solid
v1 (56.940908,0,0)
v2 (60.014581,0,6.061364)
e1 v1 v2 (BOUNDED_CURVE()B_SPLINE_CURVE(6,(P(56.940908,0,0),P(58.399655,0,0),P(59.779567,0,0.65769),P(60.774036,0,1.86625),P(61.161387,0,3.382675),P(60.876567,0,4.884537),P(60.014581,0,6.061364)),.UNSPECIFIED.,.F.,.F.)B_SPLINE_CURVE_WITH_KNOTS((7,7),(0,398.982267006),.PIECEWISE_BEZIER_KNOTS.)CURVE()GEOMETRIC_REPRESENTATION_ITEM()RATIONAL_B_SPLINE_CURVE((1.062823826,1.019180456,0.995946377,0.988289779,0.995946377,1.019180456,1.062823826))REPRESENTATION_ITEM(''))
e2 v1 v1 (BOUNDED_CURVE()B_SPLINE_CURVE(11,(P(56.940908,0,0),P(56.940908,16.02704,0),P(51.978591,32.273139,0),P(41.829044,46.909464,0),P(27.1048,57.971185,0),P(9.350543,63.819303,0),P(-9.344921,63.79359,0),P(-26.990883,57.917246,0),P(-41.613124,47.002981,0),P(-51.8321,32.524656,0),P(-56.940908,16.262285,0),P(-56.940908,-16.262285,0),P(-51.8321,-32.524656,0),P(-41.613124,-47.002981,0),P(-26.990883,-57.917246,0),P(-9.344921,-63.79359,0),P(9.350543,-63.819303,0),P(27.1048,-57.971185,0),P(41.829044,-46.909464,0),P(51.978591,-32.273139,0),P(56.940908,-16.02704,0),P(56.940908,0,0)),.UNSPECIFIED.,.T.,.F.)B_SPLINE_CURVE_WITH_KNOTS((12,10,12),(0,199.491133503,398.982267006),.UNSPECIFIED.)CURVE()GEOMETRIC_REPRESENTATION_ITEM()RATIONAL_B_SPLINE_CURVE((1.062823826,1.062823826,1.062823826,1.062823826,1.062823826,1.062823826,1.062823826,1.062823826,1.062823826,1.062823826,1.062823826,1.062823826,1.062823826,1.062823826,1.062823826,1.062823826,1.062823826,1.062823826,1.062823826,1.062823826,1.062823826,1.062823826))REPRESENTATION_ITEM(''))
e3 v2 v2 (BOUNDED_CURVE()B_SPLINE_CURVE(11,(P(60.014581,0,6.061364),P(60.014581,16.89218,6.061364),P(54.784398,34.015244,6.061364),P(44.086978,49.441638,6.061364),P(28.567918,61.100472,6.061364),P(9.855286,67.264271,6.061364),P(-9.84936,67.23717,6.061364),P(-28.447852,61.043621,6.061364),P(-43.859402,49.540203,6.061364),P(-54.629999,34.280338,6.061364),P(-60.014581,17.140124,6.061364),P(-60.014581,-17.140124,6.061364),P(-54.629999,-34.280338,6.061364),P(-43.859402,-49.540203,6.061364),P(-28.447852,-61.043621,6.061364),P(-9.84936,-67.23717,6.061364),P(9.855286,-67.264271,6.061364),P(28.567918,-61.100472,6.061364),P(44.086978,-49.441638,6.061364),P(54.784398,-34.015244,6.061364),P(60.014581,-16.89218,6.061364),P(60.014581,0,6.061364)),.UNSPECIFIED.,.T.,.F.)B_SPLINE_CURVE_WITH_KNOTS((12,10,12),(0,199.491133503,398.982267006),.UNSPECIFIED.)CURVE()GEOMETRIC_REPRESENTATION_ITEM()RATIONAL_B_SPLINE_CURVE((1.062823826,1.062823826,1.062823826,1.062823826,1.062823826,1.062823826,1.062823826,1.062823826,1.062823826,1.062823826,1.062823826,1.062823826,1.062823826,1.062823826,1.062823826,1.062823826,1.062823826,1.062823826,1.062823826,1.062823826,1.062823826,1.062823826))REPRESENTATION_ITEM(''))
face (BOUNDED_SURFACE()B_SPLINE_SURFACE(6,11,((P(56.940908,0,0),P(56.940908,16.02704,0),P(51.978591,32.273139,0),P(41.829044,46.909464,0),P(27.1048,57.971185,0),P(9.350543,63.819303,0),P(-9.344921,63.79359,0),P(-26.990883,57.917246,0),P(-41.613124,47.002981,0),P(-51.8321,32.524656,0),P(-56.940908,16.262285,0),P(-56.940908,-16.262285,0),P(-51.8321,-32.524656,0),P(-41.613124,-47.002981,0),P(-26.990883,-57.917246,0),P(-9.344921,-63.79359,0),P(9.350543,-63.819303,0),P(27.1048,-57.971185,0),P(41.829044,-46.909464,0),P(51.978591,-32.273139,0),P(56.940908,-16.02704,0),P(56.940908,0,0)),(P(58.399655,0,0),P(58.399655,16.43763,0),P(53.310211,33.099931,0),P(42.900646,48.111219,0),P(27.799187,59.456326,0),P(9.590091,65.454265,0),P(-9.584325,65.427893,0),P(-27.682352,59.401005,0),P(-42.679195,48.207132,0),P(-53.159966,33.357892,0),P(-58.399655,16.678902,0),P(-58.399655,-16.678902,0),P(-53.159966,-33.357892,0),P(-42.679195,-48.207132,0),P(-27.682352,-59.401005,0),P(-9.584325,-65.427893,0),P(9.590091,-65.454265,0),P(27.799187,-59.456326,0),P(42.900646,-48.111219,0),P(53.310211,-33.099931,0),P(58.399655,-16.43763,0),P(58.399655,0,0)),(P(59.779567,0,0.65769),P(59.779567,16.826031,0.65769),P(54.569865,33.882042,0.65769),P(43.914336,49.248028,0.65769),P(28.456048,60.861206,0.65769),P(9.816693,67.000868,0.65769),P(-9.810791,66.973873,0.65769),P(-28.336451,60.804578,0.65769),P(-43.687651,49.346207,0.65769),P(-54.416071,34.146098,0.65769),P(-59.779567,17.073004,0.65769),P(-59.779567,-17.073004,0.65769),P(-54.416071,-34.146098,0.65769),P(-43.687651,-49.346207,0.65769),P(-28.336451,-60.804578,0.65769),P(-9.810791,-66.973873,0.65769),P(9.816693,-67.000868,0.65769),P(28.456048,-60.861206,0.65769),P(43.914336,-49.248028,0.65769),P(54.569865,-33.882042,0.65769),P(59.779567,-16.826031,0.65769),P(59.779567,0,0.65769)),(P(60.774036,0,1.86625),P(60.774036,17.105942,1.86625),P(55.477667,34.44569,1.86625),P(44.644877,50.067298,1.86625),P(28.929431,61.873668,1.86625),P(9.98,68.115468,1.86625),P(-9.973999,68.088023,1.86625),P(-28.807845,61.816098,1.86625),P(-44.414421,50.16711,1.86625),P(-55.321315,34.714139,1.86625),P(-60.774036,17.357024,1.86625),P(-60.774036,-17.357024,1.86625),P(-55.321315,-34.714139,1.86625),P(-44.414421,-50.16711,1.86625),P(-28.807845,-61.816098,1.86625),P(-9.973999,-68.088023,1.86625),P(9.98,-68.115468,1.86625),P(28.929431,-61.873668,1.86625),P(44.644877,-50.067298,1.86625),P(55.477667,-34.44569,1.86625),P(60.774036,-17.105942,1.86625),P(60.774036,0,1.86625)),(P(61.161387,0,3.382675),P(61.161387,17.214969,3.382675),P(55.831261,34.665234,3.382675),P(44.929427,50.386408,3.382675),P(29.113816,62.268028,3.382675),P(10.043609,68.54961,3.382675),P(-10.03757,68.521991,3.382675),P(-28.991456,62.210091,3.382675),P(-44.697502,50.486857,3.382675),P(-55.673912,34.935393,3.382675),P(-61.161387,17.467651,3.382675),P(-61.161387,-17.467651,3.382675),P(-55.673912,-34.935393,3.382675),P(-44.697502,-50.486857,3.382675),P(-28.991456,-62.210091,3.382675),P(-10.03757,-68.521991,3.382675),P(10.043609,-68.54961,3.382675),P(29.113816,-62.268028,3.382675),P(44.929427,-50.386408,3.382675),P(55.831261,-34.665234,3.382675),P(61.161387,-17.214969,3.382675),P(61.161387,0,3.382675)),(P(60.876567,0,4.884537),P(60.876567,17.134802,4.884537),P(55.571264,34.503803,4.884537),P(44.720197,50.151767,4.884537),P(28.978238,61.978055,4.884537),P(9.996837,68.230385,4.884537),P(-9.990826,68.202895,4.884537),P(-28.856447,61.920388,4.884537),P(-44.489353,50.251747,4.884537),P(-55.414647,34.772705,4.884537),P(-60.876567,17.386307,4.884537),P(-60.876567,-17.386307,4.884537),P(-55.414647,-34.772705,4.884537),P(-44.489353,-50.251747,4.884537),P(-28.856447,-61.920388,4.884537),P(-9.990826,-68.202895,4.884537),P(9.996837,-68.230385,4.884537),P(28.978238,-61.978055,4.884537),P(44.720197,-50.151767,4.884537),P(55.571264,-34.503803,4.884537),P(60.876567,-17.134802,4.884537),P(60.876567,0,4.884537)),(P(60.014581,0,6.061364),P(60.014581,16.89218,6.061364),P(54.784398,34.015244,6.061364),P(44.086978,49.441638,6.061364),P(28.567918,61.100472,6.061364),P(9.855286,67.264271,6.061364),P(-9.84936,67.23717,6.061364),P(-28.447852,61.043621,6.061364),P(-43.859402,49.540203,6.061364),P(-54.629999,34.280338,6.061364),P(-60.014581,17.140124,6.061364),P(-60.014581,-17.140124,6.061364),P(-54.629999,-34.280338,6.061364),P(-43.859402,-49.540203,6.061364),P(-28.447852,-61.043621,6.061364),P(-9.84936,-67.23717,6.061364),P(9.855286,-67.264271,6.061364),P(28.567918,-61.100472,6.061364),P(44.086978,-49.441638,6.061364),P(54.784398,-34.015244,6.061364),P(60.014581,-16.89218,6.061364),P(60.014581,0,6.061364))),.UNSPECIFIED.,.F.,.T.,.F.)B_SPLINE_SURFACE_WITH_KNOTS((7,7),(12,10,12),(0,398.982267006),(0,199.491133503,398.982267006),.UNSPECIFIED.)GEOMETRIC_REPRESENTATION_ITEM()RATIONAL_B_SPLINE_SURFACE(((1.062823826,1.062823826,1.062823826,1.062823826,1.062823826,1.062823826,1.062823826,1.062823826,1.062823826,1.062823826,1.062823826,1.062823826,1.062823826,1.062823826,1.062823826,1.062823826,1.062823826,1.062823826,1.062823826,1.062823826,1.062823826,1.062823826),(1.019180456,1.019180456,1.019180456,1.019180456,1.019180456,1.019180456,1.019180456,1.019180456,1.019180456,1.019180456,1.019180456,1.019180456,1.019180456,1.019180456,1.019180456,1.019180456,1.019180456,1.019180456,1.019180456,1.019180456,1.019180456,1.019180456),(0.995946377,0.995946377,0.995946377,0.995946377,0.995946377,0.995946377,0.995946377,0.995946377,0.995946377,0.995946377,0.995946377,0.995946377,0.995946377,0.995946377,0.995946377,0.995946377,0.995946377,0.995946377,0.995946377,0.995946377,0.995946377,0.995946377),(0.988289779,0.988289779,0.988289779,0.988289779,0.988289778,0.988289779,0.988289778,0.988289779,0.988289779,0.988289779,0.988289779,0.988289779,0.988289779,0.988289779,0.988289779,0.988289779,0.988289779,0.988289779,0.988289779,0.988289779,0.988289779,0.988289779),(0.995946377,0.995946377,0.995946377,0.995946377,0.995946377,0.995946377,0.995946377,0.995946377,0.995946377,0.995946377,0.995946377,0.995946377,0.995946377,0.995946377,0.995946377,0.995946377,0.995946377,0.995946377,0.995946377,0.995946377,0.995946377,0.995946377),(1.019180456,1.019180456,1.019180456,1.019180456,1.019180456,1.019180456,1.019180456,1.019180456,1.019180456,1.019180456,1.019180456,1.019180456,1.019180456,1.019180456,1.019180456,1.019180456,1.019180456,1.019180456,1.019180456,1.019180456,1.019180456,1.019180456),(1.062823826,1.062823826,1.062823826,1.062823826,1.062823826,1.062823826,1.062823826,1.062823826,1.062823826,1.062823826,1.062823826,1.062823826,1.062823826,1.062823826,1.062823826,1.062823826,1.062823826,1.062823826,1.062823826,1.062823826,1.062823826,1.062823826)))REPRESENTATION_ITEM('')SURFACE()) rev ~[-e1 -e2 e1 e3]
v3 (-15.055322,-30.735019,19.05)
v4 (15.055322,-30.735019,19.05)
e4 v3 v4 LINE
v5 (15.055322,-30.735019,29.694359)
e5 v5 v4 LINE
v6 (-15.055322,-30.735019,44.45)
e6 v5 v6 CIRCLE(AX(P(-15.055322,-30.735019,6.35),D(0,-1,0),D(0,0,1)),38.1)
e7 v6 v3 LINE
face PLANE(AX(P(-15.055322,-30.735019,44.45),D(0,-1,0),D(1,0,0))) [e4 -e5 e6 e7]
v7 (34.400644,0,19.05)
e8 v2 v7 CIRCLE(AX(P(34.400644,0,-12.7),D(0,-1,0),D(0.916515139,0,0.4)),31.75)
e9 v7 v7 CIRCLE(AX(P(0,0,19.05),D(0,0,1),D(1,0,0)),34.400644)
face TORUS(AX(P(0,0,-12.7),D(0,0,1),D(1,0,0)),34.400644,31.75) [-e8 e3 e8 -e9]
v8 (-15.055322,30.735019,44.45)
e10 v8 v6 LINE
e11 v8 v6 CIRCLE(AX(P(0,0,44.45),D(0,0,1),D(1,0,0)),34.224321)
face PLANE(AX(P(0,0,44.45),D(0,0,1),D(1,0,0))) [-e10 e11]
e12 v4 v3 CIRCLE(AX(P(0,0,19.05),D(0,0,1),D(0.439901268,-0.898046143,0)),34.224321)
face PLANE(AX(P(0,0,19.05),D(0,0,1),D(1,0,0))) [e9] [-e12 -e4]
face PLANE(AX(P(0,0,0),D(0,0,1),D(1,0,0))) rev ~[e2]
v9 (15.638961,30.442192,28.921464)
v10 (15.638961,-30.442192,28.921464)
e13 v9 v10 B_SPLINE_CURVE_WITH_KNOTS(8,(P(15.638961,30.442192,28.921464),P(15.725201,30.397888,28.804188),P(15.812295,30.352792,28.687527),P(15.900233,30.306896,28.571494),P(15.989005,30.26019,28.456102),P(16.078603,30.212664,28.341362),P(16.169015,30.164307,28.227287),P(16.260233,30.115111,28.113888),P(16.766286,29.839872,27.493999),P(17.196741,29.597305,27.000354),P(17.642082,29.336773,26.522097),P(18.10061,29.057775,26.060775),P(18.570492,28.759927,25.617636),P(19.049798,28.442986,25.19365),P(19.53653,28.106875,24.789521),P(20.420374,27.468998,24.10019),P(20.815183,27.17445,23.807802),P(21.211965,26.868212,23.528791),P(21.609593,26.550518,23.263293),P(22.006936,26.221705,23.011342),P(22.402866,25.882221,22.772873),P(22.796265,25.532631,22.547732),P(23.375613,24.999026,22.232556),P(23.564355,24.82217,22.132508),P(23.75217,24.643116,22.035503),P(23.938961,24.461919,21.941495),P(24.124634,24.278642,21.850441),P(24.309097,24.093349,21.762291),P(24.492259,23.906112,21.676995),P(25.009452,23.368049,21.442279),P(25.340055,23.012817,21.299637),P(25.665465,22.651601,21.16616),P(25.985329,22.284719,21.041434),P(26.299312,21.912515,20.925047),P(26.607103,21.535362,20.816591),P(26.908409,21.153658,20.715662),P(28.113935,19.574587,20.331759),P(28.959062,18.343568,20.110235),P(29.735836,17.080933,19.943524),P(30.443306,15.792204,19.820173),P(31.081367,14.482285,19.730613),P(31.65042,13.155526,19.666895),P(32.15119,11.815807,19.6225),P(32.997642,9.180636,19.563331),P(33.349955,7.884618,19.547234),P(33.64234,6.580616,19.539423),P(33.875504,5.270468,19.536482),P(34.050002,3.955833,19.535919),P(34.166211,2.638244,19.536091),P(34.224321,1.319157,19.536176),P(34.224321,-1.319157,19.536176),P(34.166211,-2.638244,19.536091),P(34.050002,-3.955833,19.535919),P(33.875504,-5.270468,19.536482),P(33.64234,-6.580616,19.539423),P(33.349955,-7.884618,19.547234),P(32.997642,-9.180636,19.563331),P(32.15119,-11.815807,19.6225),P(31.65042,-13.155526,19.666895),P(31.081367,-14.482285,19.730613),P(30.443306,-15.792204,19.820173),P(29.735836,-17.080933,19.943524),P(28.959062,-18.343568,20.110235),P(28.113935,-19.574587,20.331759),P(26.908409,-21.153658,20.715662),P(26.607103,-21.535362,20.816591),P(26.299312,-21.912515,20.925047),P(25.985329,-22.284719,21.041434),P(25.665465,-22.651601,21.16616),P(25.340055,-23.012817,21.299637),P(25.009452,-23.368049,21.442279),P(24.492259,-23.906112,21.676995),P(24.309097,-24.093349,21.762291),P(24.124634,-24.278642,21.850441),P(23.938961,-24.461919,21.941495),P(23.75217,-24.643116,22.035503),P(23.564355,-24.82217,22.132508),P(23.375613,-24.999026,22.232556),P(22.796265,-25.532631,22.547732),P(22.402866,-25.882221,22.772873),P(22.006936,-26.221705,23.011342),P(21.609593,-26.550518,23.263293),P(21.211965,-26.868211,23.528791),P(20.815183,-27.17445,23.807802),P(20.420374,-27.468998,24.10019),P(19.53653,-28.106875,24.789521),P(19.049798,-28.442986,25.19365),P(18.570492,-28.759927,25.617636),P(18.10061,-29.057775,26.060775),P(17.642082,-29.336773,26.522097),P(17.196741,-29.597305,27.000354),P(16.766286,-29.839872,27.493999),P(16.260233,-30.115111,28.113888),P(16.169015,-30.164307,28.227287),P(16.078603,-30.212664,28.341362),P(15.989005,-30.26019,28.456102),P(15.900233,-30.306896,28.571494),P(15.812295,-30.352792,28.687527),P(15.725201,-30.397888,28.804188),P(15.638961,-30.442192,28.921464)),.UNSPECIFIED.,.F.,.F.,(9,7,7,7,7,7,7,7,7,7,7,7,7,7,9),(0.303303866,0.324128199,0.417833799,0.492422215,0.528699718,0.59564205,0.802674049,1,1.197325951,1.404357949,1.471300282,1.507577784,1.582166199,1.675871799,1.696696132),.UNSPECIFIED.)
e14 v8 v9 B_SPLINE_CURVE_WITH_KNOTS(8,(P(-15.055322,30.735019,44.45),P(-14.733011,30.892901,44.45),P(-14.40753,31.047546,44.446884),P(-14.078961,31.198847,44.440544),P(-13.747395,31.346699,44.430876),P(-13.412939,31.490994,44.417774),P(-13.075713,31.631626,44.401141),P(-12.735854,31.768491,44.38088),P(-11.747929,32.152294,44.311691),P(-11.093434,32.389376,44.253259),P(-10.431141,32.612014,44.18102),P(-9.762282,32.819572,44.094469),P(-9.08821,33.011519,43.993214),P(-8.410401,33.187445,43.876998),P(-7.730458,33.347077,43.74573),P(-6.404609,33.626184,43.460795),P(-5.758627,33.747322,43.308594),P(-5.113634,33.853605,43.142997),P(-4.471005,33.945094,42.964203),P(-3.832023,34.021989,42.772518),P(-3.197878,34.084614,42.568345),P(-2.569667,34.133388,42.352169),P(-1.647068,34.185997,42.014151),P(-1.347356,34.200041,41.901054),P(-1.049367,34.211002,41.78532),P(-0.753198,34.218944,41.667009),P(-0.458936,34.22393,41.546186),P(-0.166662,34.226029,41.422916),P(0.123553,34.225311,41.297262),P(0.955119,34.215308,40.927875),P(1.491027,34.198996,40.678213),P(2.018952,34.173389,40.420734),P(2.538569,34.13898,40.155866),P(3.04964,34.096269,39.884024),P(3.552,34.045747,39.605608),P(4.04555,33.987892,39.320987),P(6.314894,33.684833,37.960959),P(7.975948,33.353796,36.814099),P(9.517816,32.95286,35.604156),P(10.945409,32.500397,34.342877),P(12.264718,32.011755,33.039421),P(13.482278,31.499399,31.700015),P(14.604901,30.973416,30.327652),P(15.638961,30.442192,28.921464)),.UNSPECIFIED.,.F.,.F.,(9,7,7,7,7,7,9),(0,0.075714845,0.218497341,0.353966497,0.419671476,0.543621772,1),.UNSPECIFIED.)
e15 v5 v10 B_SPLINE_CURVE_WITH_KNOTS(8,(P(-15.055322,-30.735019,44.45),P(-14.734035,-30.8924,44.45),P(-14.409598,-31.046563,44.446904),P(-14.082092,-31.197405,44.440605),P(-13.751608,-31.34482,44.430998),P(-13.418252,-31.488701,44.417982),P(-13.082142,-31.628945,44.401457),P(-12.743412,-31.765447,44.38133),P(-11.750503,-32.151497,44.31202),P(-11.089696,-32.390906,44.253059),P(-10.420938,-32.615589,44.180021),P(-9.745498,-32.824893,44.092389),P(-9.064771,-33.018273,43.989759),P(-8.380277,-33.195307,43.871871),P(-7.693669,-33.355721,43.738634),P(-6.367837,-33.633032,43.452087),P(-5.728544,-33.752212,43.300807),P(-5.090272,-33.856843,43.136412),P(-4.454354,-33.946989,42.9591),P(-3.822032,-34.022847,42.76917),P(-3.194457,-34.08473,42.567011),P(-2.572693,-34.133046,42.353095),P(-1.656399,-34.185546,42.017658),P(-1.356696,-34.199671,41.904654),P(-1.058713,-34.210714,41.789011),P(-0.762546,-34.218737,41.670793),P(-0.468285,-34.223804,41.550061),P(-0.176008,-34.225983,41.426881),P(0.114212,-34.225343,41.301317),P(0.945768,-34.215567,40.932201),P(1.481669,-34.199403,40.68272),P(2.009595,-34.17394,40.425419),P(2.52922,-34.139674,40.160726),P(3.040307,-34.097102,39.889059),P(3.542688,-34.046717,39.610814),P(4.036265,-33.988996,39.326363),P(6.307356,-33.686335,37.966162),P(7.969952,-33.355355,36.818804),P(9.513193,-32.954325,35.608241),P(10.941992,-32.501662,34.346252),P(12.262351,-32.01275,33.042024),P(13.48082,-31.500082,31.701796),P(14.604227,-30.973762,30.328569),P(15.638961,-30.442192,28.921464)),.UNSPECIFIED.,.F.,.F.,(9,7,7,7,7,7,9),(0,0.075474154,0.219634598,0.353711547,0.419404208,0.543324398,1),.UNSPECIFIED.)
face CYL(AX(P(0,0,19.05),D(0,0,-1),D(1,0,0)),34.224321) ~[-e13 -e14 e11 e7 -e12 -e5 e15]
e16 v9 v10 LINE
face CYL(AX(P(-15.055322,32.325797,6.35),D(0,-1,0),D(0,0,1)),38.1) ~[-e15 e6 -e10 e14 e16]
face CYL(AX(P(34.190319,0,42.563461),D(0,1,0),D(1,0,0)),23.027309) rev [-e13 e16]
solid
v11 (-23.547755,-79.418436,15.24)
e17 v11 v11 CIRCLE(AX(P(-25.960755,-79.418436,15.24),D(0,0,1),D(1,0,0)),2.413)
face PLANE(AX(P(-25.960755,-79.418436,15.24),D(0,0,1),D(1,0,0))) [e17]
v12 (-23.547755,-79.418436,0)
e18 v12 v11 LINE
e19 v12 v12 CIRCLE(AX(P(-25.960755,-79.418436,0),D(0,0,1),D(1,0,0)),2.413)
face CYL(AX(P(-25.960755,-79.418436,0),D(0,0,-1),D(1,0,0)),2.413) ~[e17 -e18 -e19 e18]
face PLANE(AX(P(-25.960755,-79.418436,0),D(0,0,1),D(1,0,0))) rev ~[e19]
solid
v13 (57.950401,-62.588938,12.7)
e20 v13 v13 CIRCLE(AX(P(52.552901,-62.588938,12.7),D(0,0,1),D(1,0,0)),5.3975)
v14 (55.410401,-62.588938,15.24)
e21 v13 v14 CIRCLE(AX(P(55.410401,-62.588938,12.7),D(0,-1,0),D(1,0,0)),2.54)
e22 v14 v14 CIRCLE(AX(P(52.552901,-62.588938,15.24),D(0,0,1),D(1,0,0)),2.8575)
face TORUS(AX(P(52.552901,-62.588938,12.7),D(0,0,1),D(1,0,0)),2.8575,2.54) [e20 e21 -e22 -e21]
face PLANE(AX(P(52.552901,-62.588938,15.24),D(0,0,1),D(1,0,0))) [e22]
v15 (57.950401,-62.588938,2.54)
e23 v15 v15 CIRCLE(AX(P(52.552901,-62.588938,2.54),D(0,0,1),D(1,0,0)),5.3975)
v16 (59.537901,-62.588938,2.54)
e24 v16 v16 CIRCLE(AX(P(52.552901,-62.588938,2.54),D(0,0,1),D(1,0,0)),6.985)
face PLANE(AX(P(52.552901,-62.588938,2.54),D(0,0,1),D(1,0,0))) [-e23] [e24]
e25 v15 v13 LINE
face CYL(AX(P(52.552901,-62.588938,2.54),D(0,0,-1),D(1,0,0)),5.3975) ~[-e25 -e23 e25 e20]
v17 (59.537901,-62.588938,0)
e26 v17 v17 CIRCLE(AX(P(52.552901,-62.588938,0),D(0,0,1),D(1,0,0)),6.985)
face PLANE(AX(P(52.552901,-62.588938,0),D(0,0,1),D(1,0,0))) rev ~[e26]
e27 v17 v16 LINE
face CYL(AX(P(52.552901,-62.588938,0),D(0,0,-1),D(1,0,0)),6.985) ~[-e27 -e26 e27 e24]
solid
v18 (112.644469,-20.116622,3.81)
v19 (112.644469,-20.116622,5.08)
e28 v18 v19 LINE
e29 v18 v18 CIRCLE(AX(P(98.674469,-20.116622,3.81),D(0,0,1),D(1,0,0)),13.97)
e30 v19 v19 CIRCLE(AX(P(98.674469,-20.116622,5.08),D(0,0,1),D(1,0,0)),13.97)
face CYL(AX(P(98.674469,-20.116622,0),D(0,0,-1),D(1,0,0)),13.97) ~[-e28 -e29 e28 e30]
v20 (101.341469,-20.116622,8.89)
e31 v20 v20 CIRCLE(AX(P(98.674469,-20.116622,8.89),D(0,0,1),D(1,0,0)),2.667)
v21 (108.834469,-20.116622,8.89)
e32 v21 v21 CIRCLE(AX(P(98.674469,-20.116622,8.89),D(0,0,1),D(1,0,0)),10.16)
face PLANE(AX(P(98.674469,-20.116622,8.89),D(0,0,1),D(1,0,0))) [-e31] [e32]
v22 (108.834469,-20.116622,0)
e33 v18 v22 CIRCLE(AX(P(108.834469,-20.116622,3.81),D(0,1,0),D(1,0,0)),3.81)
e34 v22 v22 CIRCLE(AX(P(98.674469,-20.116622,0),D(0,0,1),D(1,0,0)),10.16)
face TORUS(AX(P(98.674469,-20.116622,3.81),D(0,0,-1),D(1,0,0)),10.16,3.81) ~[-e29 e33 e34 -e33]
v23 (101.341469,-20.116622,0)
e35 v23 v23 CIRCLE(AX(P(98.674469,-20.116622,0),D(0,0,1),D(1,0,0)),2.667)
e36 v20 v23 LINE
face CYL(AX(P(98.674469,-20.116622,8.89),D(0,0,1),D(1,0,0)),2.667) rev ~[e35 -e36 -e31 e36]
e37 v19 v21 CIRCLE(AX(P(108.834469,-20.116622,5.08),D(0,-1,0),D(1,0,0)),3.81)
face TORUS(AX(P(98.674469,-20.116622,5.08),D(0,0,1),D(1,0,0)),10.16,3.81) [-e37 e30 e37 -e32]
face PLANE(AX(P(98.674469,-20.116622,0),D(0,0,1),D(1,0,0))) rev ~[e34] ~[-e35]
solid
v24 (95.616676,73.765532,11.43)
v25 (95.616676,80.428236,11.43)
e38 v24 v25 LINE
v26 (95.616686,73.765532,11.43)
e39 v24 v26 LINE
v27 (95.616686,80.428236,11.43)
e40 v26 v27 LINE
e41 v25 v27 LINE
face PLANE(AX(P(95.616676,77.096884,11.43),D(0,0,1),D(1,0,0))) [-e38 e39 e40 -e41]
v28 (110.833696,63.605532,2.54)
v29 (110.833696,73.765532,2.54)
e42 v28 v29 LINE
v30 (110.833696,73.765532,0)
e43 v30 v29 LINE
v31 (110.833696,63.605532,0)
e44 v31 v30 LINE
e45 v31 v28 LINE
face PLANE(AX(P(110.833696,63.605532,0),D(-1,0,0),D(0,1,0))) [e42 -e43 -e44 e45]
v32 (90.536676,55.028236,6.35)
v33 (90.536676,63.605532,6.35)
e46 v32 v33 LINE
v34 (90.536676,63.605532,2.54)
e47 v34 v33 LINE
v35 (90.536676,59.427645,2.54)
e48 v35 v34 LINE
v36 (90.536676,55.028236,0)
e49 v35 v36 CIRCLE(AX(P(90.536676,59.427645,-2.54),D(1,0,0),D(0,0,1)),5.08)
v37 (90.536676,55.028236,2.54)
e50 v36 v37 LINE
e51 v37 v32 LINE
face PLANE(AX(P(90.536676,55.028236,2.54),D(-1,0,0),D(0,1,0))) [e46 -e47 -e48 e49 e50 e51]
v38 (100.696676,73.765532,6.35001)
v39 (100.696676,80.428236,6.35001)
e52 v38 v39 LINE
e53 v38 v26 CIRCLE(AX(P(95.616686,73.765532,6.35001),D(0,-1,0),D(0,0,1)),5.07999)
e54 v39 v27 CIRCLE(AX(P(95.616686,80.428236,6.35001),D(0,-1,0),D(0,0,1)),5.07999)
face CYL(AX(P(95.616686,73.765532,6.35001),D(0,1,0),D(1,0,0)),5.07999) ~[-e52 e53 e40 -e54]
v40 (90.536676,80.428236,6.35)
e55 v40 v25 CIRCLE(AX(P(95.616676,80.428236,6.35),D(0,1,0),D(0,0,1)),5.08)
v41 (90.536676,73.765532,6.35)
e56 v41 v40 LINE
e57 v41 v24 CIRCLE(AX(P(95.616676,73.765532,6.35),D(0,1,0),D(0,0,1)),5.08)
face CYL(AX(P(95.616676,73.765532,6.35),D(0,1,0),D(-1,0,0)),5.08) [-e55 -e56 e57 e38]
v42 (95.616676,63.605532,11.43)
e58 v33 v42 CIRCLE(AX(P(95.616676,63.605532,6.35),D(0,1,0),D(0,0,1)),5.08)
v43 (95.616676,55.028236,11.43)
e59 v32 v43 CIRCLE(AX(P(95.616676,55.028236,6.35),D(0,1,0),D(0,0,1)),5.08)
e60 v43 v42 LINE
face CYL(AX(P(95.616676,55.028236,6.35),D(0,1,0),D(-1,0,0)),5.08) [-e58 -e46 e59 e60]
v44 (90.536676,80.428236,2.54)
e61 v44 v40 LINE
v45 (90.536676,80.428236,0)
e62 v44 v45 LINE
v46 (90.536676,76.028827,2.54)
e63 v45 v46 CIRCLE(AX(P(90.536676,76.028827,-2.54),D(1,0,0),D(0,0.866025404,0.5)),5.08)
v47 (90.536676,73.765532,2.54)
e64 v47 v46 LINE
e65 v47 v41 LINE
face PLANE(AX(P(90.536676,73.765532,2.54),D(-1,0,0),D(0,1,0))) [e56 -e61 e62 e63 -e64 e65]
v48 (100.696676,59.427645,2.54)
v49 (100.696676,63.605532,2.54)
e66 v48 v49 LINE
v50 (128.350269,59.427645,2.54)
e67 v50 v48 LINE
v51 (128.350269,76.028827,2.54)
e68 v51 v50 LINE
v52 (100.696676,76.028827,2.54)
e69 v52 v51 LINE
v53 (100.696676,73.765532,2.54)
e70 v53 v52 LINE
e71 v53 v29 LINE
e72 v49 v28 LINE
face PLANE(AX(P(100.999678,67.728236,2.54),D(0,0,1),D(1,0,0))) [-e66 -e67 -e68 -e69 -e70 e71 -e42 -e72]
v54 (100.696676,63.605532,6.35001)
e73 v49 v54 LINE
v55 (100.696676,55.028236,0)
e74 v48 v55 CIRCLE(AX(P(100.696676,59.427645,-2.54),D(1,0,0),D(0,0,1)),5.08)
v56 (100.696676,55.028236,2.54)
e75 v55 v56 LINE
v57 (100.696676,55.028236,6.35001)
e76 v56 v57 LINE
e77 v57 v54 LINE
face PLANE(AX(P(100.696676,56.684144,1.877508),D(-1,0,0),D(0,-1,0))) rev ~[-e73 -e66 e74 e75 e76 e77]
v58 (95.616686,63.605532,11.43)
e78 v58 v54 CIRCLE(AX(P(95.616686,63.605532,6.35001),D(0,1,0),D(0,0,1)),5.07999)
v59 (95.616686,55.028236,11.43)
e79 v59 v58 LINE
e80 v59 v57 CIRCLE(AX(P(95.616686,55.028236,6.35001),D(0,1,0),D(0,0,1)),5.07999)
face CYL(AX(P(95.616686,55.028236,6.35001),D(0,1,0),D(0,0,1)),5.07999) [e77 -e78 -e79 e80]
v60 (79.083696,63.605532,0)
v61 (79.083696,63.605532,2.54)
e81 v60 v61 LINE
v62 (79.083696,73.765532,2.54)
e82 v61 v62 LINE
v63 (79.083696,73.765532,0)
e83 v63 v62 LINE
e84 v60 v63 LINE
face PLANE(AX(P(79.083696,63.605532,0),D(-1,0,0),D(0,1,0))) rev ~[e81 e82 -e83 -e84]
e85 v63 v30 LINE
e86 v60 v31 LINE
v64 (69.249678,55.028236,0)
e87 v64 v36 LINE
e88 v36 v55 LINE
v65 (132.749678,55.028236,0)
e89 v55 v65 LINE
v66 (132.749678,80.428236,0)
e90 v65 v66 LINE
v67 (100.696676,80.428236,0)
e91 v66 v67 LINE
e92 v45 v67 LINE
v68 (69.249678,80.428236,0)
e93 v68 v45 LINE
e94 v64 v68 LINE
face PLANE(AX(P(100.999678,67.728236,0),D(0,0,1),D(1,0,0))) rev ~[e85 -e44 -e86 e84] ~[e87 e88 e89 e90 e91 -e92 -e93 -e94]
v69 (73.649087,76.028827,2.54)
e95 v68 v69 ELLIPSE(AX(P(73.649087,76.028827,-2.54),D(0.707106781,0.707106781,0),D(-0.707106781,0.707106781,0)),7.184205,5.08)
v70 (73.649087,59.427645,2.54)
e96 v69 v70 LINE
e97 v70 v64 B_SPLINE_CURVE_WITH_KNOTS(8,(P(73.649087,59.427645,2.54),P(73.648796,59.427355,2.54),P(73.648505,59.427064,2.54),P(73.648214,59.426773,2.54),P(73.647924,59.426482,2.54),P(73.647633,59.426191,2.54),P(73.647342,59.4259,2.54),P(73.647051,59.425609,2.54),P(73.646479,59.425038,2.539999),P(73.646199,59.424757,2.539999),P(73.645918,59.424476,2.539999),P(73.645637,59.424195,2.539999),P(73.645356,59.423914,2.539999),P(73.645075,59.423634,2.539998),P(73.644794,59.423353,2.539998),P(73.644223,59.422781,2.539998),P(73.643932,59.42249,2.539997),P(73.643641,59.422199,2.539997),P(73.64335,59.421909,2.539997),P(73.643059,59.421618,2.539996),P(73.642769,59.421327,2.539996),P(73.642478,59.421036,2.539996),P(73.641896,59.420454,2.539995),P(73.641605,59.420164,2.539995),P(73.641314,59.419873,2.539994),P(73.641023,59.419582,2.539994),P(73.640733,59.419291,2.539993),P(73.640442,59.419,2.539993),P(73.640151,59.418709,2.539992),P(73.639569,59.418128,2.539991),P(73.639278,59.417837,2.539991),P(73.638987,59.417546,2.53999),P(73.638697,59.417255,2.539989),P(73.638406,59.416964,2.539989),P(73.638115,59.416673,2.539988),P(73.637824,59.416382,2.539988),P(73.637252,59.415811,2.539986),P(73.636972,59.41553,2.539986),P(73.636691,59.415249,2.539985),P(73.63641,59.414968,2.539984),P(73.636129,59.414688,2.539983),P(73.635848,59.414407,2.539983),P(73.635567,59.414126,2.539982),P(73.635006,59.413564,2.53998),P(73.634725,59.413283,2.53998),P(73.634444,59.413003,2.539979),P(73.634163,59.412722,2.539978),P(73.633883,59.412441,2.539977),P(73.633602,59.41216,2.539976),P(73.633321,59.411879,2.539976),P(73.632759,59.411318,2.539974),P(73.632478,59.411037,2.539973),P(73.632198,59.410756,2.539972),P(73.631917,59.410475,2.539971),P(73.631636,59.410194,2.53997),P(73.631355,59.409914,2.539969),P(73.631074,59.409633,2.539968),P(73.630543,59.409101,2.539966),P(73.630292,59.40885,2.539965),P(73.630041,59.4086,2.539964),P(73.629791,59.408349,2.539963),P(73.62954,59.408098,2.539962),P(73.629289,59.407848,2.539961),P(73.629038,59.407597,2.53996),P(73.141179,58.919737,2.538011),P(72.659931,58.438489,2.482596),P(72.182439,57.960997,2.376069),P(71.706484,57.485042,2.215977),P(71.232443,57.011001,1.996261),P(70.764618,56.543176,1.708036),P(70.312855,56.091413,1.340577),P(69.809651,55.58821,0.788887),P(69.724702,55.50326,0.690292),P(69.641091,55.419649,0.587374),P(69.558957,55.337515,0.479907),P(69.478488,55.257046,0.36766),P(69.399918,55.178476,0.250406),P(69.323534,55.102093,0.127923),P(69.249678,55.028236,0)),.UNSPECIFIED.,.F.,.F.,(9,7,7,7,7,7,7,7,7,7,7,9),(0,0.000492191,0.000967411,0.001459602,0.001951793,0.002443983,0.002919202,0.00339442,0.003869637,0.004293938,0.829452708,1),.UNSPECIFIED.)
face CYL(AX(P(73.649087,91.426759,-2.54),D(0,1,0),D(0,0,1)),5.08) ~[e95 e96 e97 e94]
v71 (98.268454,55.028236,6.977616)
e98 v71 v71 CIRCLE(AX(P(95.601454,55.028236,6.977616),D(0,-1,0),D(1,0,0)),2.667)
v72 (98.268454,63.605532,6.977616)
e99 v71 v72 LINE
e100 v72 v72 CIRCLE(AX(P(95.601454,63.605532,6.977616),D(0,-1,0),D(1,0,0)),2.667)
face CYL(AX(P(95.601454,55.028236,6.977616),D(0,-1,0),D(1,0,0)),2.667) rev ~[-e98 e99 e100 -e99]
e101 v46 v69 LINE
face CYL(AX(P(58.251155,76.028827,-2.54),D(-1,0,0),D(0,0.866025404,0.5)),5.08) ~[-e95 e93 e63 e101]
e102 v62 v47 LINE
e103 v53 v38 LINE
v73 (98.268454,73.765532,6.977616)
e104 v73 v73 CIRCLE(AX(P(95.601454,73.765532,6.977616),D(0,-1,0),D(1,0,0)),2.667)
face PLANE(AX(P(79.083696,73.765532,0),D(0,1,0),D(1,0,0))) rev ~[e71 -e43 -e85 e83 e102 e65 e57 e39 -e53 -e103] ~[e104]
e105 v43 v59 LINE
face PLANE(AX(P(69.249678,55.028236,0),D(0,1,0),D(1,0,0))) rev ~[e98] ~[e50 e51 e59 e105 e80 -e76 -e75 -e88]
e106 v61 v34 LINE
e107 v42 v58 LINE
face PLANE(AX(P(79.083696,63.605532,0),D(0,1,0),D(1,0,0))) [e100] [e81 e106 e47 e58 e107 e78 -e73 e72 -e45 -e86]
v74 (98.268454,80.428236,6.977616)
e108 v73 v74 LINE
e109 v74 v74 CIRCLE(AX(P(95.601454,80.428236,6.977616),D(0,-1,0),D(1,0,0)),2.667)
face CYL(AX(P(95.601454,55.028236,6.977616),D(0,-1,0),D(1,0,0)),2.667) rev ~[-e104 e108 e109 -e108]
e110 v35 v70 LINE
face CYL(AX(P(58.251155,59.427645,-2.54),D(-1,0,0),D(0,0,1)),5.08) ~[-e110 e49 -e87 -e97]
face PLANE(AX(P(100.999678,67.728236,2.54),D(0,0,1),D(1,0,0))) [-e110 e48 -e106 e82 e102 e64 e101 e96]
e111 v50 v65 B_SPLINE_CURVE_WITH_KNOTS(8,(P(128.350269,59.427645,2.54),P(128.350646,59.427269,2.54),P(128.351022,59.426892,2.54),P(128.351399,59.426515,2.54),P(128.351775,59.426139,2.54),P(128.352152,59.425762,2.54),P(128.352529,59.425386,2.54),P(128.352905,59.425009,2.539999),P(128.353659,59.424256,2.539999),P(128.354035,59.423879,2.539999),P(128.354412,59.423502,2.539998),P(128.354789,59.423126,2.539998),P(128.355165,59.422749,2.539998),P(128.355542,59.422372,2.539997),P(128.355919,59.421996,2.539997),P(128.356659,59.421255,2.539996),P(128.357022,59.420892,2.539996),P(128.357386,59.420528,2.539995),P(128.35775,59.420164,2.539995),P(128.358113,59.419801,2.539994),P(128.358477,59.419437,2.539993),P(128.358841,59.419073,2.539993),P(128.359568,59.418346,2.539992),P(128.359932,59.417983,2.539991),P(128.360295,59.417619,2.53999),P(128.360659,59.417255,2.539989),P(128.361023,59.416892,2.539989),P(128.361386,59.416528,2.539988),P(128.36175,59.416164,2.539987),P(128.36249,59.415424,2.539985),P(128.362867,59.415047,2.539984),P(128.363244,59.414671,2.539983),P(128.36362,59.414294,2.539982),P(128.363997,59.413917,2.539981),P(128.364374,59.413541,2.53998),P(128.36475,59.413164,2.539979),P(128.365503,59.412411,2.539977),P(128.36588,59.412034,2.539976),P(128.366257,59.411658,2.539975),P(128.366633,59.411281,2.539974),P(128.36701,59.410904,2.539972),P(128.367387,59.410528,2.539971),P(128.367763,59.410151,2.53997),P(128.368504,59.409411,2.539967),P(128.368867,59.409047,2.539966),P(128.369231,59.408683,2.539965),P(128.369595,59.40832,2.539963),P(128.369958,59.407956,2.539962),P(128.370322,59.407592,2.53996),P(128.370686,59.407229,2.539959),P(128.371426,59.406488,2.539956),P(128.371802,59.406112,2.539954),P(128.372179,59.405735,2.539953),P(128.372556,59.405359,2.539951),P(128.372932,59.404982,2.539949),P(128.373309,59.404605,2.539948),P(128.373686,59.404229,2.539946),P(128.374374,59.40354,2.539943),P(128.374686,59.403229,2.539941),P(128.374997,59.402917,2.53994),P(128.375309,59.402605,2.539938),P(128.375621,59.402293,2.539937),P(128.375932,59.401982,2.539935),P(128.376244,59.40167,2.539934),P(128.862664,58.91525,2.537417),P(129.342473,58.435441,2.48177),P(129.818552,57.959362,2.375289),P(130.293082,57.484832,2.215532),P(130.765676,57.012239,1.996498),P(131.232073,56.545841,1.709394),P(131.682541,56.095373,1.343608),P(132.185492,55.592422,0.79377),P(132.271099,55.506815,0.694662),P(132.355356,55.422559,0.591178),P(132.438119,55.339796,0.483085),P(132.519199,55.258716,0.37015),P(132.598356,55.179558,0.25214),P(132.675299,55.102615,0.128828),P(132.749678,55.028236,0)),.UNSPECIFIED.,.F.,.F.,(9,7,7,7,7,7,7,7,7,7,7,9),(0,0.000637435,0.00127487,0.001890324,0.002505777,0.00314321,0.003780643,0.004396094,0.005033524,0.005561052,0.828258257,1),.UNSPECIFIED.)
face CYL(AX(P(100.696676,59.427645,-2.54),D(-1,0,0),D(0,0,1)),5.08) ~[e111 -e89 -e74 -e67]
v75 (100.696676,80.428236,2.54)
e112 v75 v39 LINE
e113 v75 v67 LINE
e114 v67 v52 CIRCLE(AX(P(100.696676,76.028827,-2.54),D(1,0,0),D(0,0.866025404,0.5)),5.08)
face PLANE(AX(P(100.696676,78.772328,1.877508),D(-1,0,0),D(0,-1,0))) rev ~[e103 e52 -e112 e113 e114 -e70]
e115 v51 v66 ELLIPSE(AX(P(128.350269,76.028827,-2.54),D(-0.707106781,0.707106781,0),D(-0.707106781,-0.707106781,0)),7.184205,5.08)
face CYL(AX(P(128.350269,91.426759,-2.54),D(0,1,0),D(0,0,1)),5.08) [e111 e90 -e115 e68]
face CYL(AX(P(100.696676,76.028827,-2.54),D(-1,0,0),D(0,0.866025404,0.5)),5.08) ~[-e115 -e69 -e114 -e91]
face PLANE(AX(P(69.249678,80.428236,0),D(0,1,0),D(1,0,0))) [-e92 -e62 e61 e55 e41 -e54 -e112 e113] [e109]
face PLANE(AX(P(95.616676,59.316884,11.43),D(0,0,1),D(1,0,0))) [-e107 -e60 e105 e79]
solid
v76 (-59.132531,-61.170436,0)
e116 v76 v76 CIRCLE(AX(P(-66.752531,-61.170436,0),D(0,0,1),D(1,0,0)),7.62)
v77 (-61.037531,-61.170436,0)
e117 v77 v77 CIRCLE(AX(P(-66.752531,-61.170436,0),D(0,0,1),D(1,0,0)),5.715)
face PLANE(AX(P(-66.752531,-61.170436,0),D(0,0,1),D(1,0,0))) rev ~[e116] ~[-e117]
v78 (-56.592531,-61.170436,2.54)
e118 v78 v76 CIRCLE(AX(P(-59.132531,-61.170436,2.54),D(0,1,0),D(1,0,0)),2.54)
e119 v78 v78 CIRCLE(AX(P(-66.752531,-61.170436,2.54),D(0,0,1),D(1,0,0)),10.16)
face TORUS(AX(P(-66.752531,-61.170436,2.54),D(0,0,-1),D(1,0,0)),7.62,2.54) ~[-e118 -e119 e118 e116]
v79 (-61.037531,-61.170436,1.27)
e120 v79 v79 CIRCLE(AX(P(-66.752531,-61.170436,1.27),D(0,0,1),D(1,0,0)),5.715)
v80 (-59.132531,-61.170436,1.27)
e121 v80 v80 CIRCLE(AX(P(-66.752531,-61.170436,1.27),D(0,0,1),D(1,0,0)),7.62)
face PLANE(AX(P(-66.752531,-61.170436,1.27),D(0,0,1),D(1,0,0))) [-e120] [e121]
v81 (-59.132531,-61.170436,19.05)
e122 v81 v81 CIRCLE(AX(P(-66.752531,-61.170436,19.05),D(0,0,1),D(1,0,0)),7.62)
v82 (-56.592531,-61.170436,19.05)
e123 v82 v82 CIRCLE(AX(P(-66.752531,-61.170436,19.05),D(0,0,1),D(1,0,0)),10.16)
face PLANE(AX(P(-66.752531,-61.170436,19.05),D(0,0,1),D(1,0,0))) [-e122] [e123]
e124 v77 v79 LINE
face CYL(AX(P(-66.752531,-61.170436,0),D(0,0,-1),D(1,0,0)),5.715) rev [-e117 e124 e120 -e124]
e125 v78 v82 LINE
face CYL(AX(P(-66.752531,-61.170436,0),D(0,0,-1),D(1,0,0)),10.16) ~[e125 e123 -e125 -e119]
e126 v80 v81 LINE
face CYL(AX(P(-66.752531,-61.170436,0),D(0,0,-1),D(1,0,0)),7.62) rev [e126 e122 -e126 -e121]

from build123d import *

# Parameters (mm, degrees)
F0_R          = 63.5
F1_DEPTH      = 19.05
F3_R          = 3.81
F4_R          = 34.2243208574
F5_DEPTH      = 25.4
F6_R          = 23.0273094471
F7_DEPTH      = 60.7519101096
F8_DEPTH      = 71.374
F9_R          = 38.1
F10_R         = 7.62
F10_R_2       = 5.715
F11_DEPTH     = 1.27
F10_R_3       = 10.16
F12_DEPTH     = 19.05
F13_R         = 2.54
F14_R         = 6.985
F15_DEPTH     = 2.54
F16_R         = 5.3975
F17_DEPTH     = 12.7
F18_R         = 2.54
F19_W         = 30.2823996797
F19_H         = 4.1530619248
F20_DEPTH     = 25.4
F21_W         = 63.5
F21_H         = 25.4
F21_W_2       = 31.75
F21_H_2       = 10.16
F22_DEPTH     = 2.54
F23_W         = 10.16
F23_H         = 8.5772957325
F23_H_2       = 6.6627042675
F24_DEPTH     = 8.89
F25_R         = 5.08
F26_R         = 5.07999
F28_R         = 2.667
F29_DEPTH     = 150.114
F30_T1_DEPTH  = 43.0515242213
F30_T3_DEPTH  = 47.3970452561
F30_T5_DEPTH  = 32.2855210348
F30_T10_DEPTH = 54.0500468494
F30_T15_DEPTH = 54.0500468494
F30_T20_DEPTH = 43.2840436629
F30_T25_DEPTH = 43.2840436629
F21_R         = 13.97
F31_DEPTH     = 8.89
F32_R         = 3.81
F33_R         = 2.667
F34_DEPTH     = 29.464
F35_R         = 2.413
F36_DEPTH     = 15.24


# Not quite as in the source:
# - a fillet or chamfer that OpenCascade refuses, or shapes differently, is made with other operations: its cross-section is extruded or revolved along the edge and cut away or added
# - a fillet or chamfer is up to 0.001 mm smaller than in the source, because OpenCascade refuses the exact size


with BuildPart() as f1:
    # F0 (on Top) → F1 (new body)
    with BuildSketch(Plane.XY):
        Circle(F0_R)
    extrude(amount=F1_DEPTH)

    # F2: fillet of radius 31.75 on 1 edges, made by hand

    # F2_s1 → F2_t2 (revolve, cut)
    with BuildSketch(Plane.XZ):
        with BuildLine():
            ThreePointArc((63.5, 0), (51.7908355378, 13.8639558425), (34.400644337, 19.05))
            Line((34.400644337, 19.05), (63.5, 19.05))
            Line((63.5, 19.05), (63.5, 0))
        make_face()
    revolve(axis=Axis((0, 0, 19.05), (0, 0, 1)), mode=Mode.SUBTRACT)

    # F3
    f3_edges = [f1.edges().sort_by_distance(p)[0] for p in [
        (-63.5, 0, 0),
    ]]
    fillet(f3_edges, radius=F3_R)

    # F4 (on face) → F5 (join)
    with BuildSketch(Plane.XY.offset(19.05)):
        Circle(F4_R)
    extrude(amount=F5_DEPTH)

    # F6 (on Front) → F7 (cut, through all)
    with BuildSketch(Plane.XZ):
        with Locations((34.1903194785, 42.5634607673)):
            Circle(F6_R)
    extrude(amount=F7_DEPTH, mode=Mode.SUBTRACT)

    # F6 (on Front) → F8 (cut)
    with BuildSketch(Plane.XZ):
        with Locations((34.1903194785, 42.5634607673)):
            Circle(F6_R)
    extrude(amount=-F8_DEPTH, mode=Mode.SUBTRACT)

    # F9
    f9_edges = [f1.edges().sort_by_distance(p)[0] for p in [
        (11.240419, 0, 44.45),
    ]]
    fillet(f9_edges, radius=F9_R)

    # F19 (on face) → F20 (cut)
    with BuildSketch(Plane.XY.offset(44.45)):
        with Locations((0.085877689, -32.8115502902)):
            Rectangle(F19_W, F19_H)
    extrude(amount=-F20_DEPTH, mode=Mode.SUBTRACT)


with BuildPart() as f11:
    # F10 (on Top) → F11 (new body)
    with BuildSketch(Plane.XY):
        with Locations((-66.7525306344, -61.1704364419)):
            Circle(F10_R)
        with Locations((-66.7525306344, -61.1704364419)):
            Circle(F10_R_2, mode=Mode.SUBTRACT)
    extrude(amount=F11_DEPTH)

    # F10 (on Top) → F12 (join)
    with BuildSketch(Plane.XY):
        with Locations((-66.7525306344, -61.1704364419)):
            Circle(F10_R_3)
        with Locations((-66.7525306344, -61.1704364419)):
            Circle(F10_R, mode=Mode.SUBTRACT)
    extrude(amount=F12_DEPTH)

    # F13
    f13_edges = [f11.edges().sort_by_distance(p)[0] for p in [
        (-76.912531, -61.170436, 0),
    ]]
    fillet(f13_edges, radius=F13_R)


with BuildPart() as f15:
    # F14 (on Top) → F15 (new body)
    with BuildSketch(Plane.XY):
        with Locations((52.5529012084, -62.5889375806)):
            Circle(F14_R)
    extrude(amount=F15_DEPTH)

    # F16 (on face) → F17 (join)
    with BuildSketch(Plane.XY.offset(2.54)):
        with Locations((52.5529012084, -62.5889375806)):
            Circle(F16_R)
    extrude(amount=F17_DEPTH)

    # F18
    f18_edges = [f15.edges().sort_by_distance(p)[0] for p in [
        (47.155401, -62.588938, 15.24),
    ]]
    fillet(f18_edges, radius=F18_R)


with BuildPart() as f22:
    # F21 (on Top) → F22 (new body)
    with BuildSketch(Plane.XY):
        with Locations((100.9996779405, 67.7282363176)):
            Rectangle(F21_W, F21_H)
        with Locations((94.9586960077, 68.6855320501)):
            Rectangle(F21_W_2, F21_H_2, mode=Mode.SUBTRACT)
    extrude(amount=F22_DEPTH)

    # F23 (on face) → F24 (join)
    with BuildSketch(Plane.XY.offset(2.54)):
        with Locations((95.6166763473, 59.3168841839)):
            Rectangle(F23_W, F23_H)
        with Locations((95.6166763473, 77.0968841839)):
            Rectangle(F23_W, F23_H_2)
    extrude(amount=F24_DEPTH)

    # F25
    f25_edges = [f22.edges().sort_by_distance(p)[0] for p in [
        (90.536676, 77.096884, 11.43),
        (90.536676, 59.316884, 11.43),
    ]]
    fillet(f25_edges, radius=F25_R)

    # F26 (radius 5.08 in the source; OpenCascade refuses exactly that, so slightly less here)
    f26_edges = [f22.edges().sort_by_distance(p)[0] for p in [
        (100.696676, 59.316884, 11.43),
        (100.696676, 77.096884, 11.43),
    ]]
    fillet(f26_edges, radius=F26_R)

    # F28 (on face) → F29 (cut)
    with BuildSketch(Plane.XZ.offset(-55.0282363176)):
        with Locations((95.6014543772, 6.9776163436)):
            Circle(F28_R)
    extrude(amount=-F29_DEPTH, mode=Mode.SUBTRACT)

    # F30: fillet of radius 5.08 on 6 edges, made by hand

    # F30_s2 → F30_t1 (cut)
    with BuildSketch(Plane.YZ.offset(100.6966763473)):
        with BuildLine():
            ThreePointArc((80.4282363176, 0), (78.5688272664, 1.8594090512), (76.0288272664, 2.54))
            Line((76.0288272664, 2.54), (80.4282363176, 2.54))
            Line((80.4282363176, 2.54), (80.4282363176, 0))
        make_face()
        with BuildLine():
            ThreePointArc((59.4276453689, 2.54), (56.8876453689, 1.8594090512), (55.0282363176, 0))
            Line((55.0282363176, 0), (55.0282363176, 2.54))
            Line((55.0282363176, 2.54), (59.4276453689, 2.54))
        make_face()
    extrude(amount=F30_T1_DEPTH, mode=Mode.SUBTRACT)

    # F30_s4 → F30_t3 (cut)
    with BuildSketch(Plane.XZ.offset(-91.4267589457)):
        with BuildLine():
            ThreePointArc((128.3502688893, 2.54), (130.8902688893, 1.8594090512), (132.7496779405, 0))
            Line((132.7496779405, 0), (132.7496779405, 2.54))
            Line((132.7496779405, 2.54), (128.3502688893, 2.54))
        make_face()
        with BuildLine():
            ThreePointArc((73.6490869917, 2.54), (71.1090869917, 1.8594090512), (69.2496779405, 0))
            Line((69.2496779405, 0), (69.2496779405, 2.54))
            Line((69.2496779405, 2.54), (73.6490869917, 2.54))
        make_face()
    extrude(amount=F30_T3_DEPTH, mode=Mode.SUBTRACT)

    # F30_s6 → F30_t5 (cut)
    with BuildSketch(Plane.YZ.offset(58.2511553124)):
        with BuildLine():
            ThreePointArc((80.4282363176, 0), (78.5688272664, 1.8594090512), (76.0288272664, 2.54))
            Line((76.0288272664, 2.54), (80.4282363176, 2.54))
            Line((80.4282363176, 2.54), (80.4282363176, 0))
        make_face()
        with BuildLine():
            ThreePointArc((59.4276453689, 2.54), (56.8876453689, 1.8594090512), (55.0282363176, 0))
            Line((55.0282363176, 0), (55.0282363176, 2.54))
            Line((55.0282363176, 2.54), (59.4276453689, 2.54))
        make_face()
    extrude(amount=F30_T5_DEPTH, mode=Mode.SUBTRACT)


with BuildPart() as f30_tool8:
    # F30_s9 → F30_t10 (new body)
    with BuildSketch(Plane.YZ.offset(143.7482005686)):
        with BuildLine():
            ThreePointArc((80.4282363176, 0), (78.5688272664, 1.8594090512), (76.0288272664, 2.54))
            Line((76.0288272664, 2.54), (80.4282363176, 2.54))
            Line((80.4282363176, 2.54), (80.4282363176, 0))
        make_face()
    extrude(amount=-F30_T10_DEPTH)

    split(bisect_by=Plane.YZ.offset(90.5366763473), keep=Keep.BOTTOM)


with BuildPart() as f22_1:
    add(f22.part)

    # F30_t7: cut F30_tool8
    add(f30_tool8.part, mode=Mode.SUBTRACT)


with BuildPart() as f30_tool13:
    # F30_s14 → F30_t15 (new body)
    with BuildSketch(Plane.YZ.offset(89.6981537192)):
        with BuildLine():
            ThreePointArc((59.4276453689, 2.54), (56.8876453689, 1.8594090512), (55.0282363176, 0))
            Line((55.0282363176, 0), (55.0282363176, 2.54))
            Line((55.0282363176, 2.54), (59.4276453689, 2.54))
        make_face()
    extrude(amount=F30_T15_DEPTH)

    split(bisect_by=Plane.YZ.offset(90.5366763473), keep=Keep.BOTTOM)


with BuildPart() as f22_2:
    add(f22_1.part)

    # F30_t12: cut F30_tool13
    add(f30_tool13.part, mode=Mode.SUBTRACT)


with BuildPart() as f30_tool18:
    # F30_s19 → F30_t20 (new body)
    with BuildSketch(Plane.YZ.offset(101.5351989753)):
        with BuildLine():
            ThreePointArc((80.4282363176, 0), (78.5688272664, 1.8594090512), (76.0288272664, 2.54))
            Line((76.0288272664, 2.54), (80.4282363176, 2.54))
            Line((80.4282363176, 2.54), (80.4282363176, 0))
        make_face()
    extrude(amount=-F30_T20_DEPTH)

    split(bisect_by=Plane.YZ.offset(100.6966763473), keep=Keep.TOP)


with BuildPart() as f22_3:
    add(f22_2.part)

    # F30_t17: cut F30_tool18
    add(f30_tool18.part, mode=Mode.SUBTRACT)


with BuildPart() as f30_tool23:
    # F30_s24 → F30_t25 (new body)
    with BuildSketch(Plane.YZ.offset(58.2511553124)):
        with BuildLine():
            ThreePointArc((59.4276453689, 2.54), (56.8876453689, 1.8594090512), (55.0282363176, 0))
            Line((55.0282363176, 0), (55.0282363176, 2.54))
            Line((55.0282363176, 2.54), (59.4276453689, 2.54))
        make_face()
    extrude(amount=F30_T25_DEPTH)

    split(bisect_by=Plane.YZ.offset(100.6966763473), keep=Keep.TOP)


with BuildPart() as f22_4:
    add(f22_3.part)

    # F30_t22: cut F30_tool23
    add(f30_tool23.part, mode=Mode.SUBTRACT)


with BuildPart() as f31:
    # F21 (on Top) → F31 (new body)
    with BuildSketch(Plane.XY):
        with Locations((98.6744686961, -20.1166216284)):
            Circle(F21_R)
    extrude(amount=F31_DEPTH)

    # F32
    f32_edges = [f31.edges().sort_by_distance(p)[0] for p in [
        (84.704469, -20.116622, 0),
        (84.704469, -20.116622, 8.89),
    ]]
    fillet(f32_edges, radius=F32_R)

    # F33 (on face) → F34 (cut)
    with BuildSketch(Plane.XY.offset(8.89)):
        with Locations((98.6744686961, -20.1166216284)):
            Circle(F33_R)
    extrude(amount=-F34_DEPTH, mode=Mode.SUBTRACT)


with BuildPart() as f36:
    # F35 (on Top) → F36 (new body)
    with BuildSketch(Plane.XY):
        with Locations((-25.9607546031, -79.4184356928)):
            Circle(F35_R)
    extrude(amount=F36_DEPTH)


solid = Compound([f1.part, f11.part, f15.part, f22_4.part, f31.part, f36.part])
